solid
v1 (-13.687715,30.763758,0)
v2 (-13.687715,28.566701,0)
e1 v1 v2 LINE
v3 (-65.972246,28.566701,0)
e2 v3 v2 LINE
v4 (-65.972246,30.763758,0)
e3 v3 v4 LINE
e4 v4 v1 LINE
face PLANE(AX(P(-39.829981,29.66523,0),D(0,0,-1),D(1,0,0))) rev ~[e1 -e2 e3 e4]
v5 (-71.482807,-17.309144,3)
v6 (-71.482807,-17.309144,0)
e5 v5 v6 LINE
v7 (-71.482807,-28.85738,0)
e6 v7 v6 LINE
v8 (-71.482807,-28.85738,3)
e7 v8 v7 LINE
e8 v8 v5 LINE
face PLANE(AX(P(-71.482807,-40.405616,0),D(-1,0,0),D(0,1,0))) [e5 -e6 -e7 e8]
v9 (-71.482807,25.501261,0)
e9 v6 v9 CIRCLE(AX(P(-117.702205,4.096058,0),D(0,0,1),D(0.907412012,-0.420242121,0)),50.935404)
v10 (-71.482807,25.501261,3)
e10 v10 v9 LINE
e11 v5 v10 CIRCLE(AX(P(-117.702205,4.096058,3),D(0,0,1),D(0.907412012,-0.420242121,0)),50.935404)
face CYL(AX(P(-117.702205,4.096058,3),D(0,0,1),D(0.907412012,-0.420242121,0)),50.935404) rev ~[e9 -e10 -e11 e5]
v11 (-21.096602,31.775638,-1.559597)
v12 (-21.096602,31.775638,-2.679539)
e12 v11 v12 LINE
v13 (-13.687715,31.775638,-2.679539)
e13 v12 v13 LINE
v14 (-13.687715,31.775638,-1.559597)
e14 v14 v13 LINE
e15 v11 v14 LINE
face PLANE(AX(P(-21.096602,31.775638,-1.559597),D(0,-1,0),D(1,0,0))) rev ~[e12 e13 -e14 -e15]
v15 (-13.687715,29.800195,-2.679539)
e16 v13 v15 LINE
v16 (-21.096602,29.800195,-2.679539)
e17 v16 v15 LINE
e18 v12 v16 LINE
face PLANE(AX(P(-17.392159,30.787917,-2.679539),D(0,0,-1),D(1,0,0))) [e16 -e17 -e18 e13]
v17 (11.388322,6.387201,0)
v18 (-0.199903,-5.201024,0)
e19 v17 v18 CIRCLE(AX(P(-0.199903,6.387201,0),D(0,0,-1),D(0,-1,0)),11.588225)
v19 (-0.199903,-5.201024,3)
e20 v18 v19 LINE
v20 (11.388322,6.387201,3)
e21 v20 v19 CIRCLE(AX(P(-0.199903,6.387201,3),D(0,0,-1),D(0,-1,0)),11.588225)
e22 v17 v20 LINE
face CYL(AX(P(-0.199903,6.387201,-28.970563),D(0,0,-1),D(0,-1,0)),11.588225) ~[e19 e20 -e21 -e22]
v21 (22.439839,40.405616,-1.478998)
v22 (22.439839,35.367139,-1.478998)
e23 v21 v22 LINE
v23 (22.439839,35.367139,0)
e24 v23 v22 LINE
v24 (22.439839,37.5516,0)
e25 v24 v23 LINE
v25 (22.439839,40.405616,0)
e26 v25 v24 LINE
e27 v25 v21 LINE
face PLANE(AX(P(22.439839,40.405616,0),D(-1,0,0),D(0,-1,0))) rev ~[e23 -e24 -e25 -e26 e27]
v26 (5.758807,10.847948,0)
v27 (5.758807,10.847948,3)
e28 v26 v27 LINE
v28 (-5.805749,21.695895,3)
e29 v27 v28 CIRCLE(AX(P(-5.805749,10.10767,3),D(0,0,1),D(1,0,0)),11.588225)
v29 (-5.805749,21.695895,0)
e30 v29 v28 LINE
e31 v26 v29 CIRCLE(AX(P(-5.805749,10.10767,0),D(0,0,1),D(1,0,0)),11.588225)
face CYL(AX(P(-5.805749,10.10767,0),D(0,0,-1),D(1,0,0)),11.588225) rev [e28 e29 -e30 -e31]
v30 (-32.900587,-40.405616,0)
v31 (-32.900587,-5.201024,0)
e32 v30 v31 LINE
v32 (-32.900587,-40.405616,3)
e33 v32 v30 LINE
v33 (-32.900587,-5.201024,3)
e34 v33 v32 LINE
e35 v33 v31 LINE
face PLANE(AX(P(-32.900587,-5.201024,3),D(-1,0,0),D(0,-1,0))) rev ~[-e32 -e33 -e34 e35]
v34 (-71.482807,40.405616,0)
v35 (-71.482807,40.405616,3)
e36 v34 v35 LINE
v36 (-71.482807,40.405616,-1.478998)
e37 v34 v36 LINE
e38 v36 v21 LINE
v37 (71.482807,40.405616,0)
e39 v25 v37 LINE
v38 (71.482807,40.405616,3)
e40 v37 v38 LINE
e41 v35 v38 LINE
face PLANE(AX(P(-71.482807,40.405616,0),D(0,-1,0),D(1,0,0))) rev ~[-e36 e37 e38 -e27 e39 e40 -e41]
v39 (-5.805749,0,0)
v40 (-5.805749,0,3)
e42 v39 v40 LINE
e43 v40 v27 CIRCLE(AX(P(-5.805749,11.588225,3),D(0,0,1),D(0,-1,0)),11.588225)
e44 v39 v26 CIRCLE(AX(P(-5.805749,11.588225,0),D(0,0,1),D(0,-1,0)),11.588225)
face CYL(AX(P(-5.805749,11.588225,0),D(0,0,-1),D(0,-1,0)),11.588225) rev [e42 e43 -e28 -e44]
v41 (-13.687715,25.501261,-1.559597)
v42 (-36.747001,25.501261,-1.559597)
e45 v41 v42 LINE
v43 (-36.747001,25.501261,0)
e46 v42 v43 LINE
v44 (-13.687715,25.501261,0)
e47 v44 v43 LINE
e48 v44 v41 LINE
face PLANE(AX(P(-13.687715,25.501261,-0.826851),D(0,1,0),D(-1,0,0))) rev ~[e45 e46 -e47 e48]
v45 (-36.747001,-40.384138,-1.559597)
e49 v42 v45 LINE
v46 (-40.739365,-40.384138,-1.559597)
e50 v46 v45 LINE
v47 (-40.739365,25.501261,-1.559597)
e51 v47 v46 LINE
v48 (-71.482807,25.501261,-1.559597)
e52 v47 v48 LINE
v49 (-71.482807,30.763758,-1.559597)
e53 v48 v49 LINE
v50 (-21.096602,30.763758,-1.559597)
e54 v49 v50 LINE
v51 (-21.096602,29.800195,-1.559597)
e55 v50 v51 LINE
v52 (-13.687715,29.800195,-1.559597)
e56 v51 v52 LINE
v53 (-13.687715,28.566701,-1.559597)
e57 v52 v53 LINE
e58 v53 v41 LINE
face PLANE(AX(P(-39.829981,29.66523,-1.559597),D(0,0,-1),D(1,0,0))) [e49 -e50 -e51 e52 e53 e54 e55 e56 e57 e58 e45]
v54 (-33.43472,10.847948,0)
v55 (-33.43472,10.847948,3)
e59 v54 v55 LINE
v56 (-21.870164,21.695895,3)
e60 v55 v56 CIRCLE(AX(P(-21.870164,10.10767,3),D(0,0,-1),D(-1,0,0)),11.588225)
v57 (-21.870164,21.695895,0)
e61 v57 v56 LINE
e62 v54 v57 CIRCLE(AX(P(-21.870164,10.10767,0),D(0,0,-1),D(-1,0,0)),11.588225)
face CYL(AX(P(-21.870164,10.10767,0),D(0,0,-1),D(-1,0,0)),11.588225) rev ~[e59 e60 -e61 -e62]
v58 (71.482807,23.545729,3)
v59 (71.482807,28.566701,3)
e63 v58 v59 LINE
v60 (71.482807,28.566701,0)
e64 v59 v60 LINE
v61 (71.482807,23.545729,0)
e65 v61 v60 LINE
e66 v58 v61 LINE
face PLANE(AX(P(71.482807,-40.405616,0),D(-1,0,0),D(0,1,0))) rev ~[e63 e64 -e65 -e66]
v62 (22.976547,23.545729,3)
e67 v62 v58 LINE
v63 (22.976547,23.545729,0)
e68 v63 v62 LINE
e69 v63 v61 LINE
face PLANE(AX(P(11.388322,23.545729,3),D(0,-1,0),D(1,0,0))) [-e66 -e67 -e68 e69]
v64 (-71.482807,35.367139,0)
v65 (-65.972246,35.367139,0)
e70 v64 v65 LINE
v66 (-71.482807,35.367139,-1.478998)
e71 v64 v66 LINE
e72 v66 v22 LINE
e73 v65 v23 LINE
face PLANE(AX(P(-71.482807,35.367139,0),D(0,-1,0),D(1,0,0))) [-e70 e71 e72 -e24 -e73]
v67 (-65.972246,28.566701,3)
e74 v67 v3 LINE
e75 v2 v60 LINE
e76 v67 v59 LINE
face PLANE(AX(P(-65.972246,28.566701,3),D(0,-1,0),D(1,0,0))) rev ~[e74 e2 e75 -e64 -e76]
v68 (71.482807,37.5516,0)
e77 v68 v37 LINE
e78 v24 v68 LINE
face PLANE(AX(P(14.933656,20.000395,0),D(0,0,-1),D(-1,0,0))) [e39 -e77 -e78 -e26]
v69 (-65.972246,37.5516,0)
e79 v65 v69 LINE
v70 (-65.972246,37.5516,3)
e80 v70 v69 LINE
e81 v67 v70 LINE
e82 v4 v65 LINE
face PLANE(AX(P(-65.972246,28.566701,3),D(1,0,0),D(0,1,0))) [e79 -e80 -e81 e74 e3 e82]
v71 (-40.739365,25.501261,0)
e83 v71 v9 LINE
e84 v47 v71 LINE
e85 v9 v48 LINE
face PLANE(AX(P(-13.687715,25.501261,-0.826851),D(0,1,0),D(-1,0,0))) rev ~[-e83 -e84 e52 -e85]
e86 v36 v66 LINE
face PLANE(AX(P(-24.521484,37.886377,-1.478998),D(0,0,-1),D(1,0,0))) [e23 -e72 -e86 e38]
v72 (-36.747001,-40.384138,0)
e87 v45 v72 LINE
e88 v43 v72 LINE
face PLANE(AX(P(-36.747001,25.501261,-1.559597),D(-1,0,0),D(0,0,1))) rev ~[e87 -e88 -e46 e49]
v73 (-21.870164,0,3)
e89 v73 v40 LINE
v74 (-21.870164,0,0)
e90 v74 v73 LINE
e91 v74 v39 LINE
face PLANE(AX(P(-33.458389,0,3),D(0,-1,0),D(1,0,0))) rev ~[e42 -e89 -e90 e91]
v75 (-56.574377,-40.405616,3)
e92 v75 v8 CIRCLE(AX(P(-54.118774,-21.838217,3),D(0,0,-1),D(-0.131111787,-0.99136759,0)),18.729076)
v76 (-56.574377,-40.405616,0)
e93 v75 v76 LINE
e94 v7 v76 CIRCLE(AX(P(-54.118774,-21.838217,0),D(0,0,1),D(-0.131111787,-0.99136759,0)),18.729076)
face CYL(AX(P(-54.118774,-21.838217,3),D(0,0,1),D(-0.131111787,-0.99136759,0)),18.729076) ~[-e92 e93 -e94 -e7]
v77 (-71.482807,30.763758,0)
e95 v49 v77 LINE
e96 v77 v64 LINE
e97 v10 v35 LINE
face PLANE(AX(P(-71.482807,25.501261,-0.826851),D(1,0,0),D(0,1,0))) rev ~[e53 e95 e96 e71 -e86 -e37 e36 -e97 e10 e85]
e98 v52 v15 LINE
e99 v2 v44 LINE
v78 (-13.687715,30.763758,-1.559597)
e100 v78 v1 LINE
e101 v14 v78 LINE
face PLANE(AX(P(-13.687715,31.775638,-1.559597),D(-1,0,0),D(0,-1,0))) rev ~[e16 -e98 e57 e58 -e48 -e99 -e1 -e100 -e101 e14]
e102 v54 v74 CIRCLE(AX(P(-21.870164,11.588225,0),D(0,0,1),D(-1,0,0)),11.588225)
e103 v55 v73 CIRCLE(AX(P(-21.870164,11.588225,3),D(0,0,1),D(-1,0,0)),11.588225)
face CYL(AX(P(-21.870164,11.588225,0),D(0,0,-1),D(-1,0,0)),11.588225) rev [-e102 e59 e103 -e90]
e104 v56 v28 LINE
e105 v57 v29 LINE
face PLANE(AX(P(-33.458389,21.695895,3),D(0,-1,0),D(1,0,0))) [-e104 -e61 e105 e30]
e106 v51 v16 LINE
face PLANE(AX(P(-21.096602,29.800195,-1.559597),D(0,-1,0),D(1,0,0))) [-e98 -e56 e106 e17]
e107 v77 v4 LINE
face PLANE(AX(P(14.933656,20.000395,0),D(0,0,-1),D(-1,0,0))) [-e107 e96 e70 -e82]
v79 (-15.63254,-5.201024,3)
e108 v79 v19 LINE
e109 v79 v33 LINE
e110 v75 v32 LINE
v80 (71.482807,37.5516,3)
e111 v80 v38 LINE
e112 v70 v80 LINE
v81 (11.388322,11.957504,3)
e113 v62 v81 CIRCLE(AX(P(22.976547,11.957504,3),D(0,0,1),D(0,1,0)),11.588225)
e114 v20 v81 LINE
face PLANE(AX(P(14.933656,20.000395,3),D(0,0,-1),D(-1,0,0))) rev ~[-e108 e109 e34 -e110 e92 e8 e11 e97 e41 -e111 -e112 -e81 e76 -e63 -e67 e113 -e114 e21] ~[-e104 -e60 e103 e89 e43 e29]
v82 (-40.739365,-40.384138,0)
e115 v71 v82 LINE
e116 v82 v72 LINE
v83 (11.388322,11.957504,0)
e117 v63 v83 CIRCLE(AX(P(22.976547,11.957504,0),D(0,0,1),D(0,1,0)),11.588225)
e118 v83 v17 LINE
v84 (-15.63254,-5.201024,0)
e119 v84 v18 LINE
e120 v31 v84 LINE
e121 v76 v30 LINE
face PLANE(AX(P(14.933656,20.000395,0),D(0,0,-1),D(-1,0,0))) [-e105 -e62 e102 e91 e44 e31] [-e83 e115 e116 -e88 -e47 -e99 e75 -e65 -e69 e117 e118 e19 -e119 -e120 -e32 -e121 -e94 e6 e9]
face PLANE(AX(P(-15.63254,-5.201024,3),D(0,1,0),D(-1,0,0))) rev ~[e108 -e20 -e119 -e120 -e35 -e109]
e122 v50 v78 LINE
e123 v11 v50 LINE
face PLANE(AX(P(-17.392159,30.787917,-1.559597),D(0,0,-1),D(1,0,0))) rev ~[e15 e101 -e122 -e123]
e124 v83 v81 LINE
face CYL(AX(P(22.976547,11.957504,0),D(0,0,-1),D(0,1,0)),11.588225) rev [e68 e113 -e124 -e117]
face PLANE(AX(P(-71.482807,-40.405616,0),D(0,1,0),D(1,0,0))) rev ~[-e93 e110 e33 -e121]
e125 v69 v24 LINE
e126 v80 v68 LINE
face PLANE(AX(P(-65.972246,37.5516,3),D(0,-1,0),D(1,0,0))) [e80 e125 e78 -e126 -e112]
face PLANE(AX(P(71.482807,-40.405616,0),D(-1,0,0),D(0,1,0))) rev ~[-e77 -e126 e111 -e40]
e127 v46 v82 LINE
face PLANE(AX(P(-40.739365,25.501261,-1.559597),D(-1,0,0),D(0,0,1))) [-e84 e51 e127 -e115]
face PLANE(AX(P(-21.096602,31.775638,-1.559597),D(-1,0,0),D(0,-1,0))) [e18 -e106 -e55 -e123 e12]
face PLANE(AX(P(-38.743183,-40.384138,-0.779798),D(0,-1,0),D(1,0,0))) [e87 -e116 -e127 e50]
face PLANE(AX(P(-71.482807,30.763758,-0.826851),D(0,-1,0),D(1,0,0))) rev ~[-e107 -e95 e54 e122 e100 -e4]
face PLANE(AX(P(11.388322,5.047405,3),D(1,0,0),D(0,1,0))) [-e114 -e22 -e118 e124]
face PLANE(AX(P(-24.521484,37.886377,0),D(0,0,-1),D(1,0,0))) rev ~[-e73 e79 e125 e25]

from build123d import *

# Parameters (mm, degrees)
F0_W         = 142.9656147957
F0_H         = 80.8112323284
F1_DEPTH     = 3
F2_W         = 137.4550536275
F2_H         = 8.9848991483
F2_W_2       = 60.0944850594
F2_H_2       = 18.4983238578
F3_DEPTH     = 52.3
F4_W         = 39.2408655025
F4_H         = 21.6958951205
F5_DEPTH     = 25
F6_W         = 3.3521875739
F6_H         = 44.7733802721
F6_W_2       = 40.9712046385
F7_DEPTH     = 25
F8_W         = 102.604271844
F8_H         = 18.422623165
F9_DEPTH     = 25
F10_T1_DEPTH = 3
F10_T3_DEPTH = 60.941125497
F12_DEPTH    = 25
F14_DEPTH    = 25
F16_DEPTH    = 25
F17_W        = 93.9226467162
F17_H        = 5.0384774804
F18_DEPTH    = 1.4789979905
F19_W        = 52.2845312953
F19_H        = 2.1970570087
F20_DEPTH    = 0.8268505335
F21_DEPTH    = 0.7327459753
F22_W        = 3.9923638105
F22_H        = 1.5595965087
F23_DEPTH    = 65.8853985369
F24_W        = 7.4088871479
F24_H        = 1.9754432142
F25_DEPTH    = 1.11994287


# Not quite as in the source:
# - a fillet or chamfer that OpenCascade refuses, or shapes differently, is made with other operations: its cross-section is extruded or revolved along the edge and cut away or added


with BuildPart() as f1:
    # F0 (on Top) → F1 (new body)
    with BuildSketch(Plane.XY):
        Rectangle(F0_W, F0_H)
    extrude(amount=F1_DEPTH)

    # F2 (on face) → F3 (cut)
    with BuildSketch(Plane.XY.offset(3)):
        with Locations((2.7552805841, 33.0591509119)):
            Rectangle(F2_W, F2_H)
        with Locations((41.4355648682, 14.2965670675)):
            Rectangle(F2_W_2, F2_H_2)
    extrude(amount=-F3_DEPTH, mode=Mode.SUBTRACT)

    # F4 (on face) → F5 (cut)
    with BuildSketch(Plane.XY.offset(3)):
        with Locations((-13.8379565906, 10.8479475603)):
            Rectangle(F4_W, F4_H)
    extrude(amount=-F5_DEPTH, mode=Mode.SUBTRACT)

    # F6 (on face) → F7 (cut)
    with BuildSketch(Plane.XY.offset(3)):
        Polygon((98.6725464463, 0), (13.7504395097, 0), (13.7504395097, -5.2010240033), (17.1026270837, -5.2010240033), (17.1026270837, -49.9744042754), (13.7504395097, -49.9744042754), (13.7504395097, -55.2418604493), (98.6725464463, -55.2418604493), align=None)
        with Locations((15.4265332967, -27.5877141394)):
            Rectangle(F6_W, F6_H)
        with Locations((-6.7351628095, -27.5877141394)):
            Rectangle(F6_W_2, F6_H)
    extrude(amount=-F7_DEPTH, mode=Mode.SUBTRACT)

    # F8 (on face) → F9 (cut)
    with BuildSketch(Plane.XY.offset(3)):
        with Locations((62.6904582605, -4.1639064439)):
            Rectangle(F8_W, F8_H)
    extrude(amount=-F9_DEPTH, mode=Mode.SUBTRACT)

    # F10: fillet of radius 11.5882250994 on 7 edges, made by hand

    # F10_s2 → F10_t1 (join)
    with BuildSketch(Plane.XY):
        with BuildLine():
            ThreePointArc((22.9765474379, 23.5457289964), (14.7824348882, 20.1516164467), (11.3883223385, 11.957503897))
            Line((11.3883223385, 11.957503897), (11.3883223385, 23.5457289964))
            Line((11.3883223385, 23.5457289964), (22.9765474379, 23.5457289964))
        make_face()
        with BuildLine():
            ThreePointArc((-15.6325400293, -5.2010240033), (-23.826652579, -8.595136553), (-27.2207651287, -16.7892491027))
            Line((-27.2207651287, -16.7892491027), (-27.2207651287, -5.2010240033))
            Line((-27.2207651287, -5.2010240033), (-15.6325400293, -5.2010240033))
        make_face()
        with BuildLine():
            ThreePointArc((-33.4583893418, 10.1076700211), (-30.0642767921, 18.3017825708), (-21.8701642424, 21.6958951205))
            Line((-21.8701642424, 21.6958951205), (-33.4583893418, 21.6958951205))
            Line((-33.4583893418, 21.6958951205), (-33.4583893418, 10.1076700211))
        make_face()
        with BuildLine():
            ThreePointArc((-5.8057489387, 0), (2.388363611, 3.3941125497), (5.7824761607, 11.5882250994))
            Line((5.7824761607, 11.5882250994), (5.7824761607, 0))
            Line((5.7824761607, 0), (-5.8057489387, 0))
        make_face()
        with BuildLine():
            ThreePointArc((-33.4583893418, 11.5882250994), (-30.0642767921, 3.3941125497), (-21.8701642424, 0))
            Line((-21.8701642424, 0), (-33.4583893418, 0))
            Line((-33.4583893418, 0), (-33.4583893418, 11.5882250994))
        make_face()
        with BuildLine():
            ThreePointArc((5.7824761607, 10.1076700211), (2.388363611, 18.3017825708), (-5.8057489387, 21.6958951205))
            Line((-5.8057489387, 21.6958951205), (5.7824761607, 21.6958951205))
            Line((5.7824761607, 21.6958951205), (5.7824761607, 10.1076700211))
        make_face()
    extrude(amount=F10_T1_DEPTH)

    # F10_s4 → F10_t3 (cut)
    with BuildSketch(Plane.XY.offset(-28.9705627485)):
        with BuildLine():
            ThreePointArc((-0.1999027609, -5.2010240033), (7.9942097888, -1.8069114536), (11.3883223385, 6.3872010961))
            Line((11.3883223385, 6.3872010961), (11.3883223385, -5.2010240033))
            Line((11.3883223385, -5.2010240033), (-0.1999027609, -5.2010240033))
        make_face()
    extrude(amount=F10_T3_DEPTH, mode=Mode.SUBTRACT)

    # F11 (on face) → F12 (cut)
    with BuildSketch(Plane.XY.offset(3)):
        with BuildLine():
            Line((-71.4828073978, 25.5012605339), (-71.4828073978, -17.3091441393))
            ThreePointArc((-71.4828073978, -17.3091441393), (-66.7668008007, 4.0960581973), (-71.4828073978, 25.5012605339))
        make_face()
    extrude(amount=-F12_DEPTH, mode=Mode.SUBTRACT)

    # F13 (on face) → F14 (cut)
    with BuildSketch(Plane.XY.offset(3)):
        with BuildLine():
            ThreePointArc((-21.3245461018, -6.6952891353), (-30.1185964093, -13.4662376926), (-27.2207651287, -24.1799503565))
            Line((-27.2207651287, -24.1799503565), (-27.2207651287, -16.7892491027))
            ThreePointArc((-27.2207651287, -16.7892491027), (-25.6387183355, -10.944306275), (-21.3245461018, -6.6952891353))
        make_face()
        with BuildLine():
            ThreePointArc((-27.2207651287, -32.8327932205), (-29.4171017882, -37.101902666), (-32.9005867243, -40.4056161642))
            Line((-32.9005867243, -40.4056161642), (-27.2207651287, -40.4056161642))
            Line((-27.2207651287, -40.4056161642), (-27.2207651287, -32.8327932205))
        make_face()
        with BuildLine():
            ThreePointArc((-56.574376872, -40.4056161642), (-65.5880780241, -36.6447482344), (-71.4828073978, -28.8573801517))
            Line((-71.4828073978, -28.8573801517), (-71.4828073978, -40.4056161642))
            Line((-71.4828073978, -40.4056161642), (-56.574376872, -40.4056161642))
        make_face()
    extrude(amount=-F14_DEPTH, mode=Mode.SUBTRACT)

    # F15 (on face) → F16 (cut)
    with BuildSketch(Plane.XY.offset(3)):
        with BuildLine():
            Line((-32.9005867243, -5.2010240033), (-32.9005867243, -40.4056161642))
            ThreePointArc((-32.9005867243, -40.4056161642), (-29.4171017882, -37.101902666), (-27.2207651287, -32.8327932205))
            Line((-27.2207651287, -32.8327932205), (-27.2207651287, -24.1799503565))
            ThreePointArc((-27.2207651287, -24.1799503565), (-30.1185964093, -13.4662376926), (-21.3245461018, -6.6952891353))
            ThreePointArc((-21.3245461018, -6.6952891353), (-18.5749778542, -5.5808138595), (-15.6325400293, -5.2010240033))
            Line((-15.6325400293, -5.2010240033), (-32.9005867243, -5.2010240033))
        make_face()
    extrude(amount=-F16_DEPTH, mode=Mode.SUBTRACT)

    # F17 (on face) → F18 (join)
    with BuildSketch(Plane(origin=(0, 0, 0), x_dir=(1, 0, 0), z_dir=(0, 0, -1))):
        with Locations((-24.5214840397, -37.886377424)):
            Rectangle(F17_W, F17_H)
    extrude(amount=F18_DEPTH)

    # F19 (on face) → F20 (join)
    with BuildSketch(Plane(origin=(0, 0, 0), x_dir=(1, 0, 0), z_dir=(0, 0, -1))):
        with Locations((-39.829980582, -29.6652298421)):
            Rectangle(F19_W, F19_H)
        Polygon((-71.4828073978, -30.7637583464), (-65.9722462296, -30.7637583464), (-65.9722462296, -28.5667013377), (-13.6877149343, -28.5667013377), (-13.6877149343, -25.5012605339), (-71.4828073978, -25.5012605339), align=None)
    extrude(amount=F20_DEPTH)

    # F21 (add): a face of the model
    f21_faces = [f1.faces().sort_by_distance(p)[0] for p in [
        (-42.5852611661, 28.1325094402, -0.8268505335),
    ]]
    extrude(f21_faces, amount=F21_DEPTH)

    # F22 (on face) → F23 (join)
    with BuildSketch(Plane.XZ.offset(-25.5012605339)):
        with Locations((-38.7431830168, -0.7797982544)):
            Rectangle(F22_W, F22_H)
    extrude(amount=F23_DEPTH)

    # F24 (on face) → F25 (join)
    with BuildSketch(Plane(origin=(0, 0, -1.5595965087), x_dir=(1, 0, 0), z_dir=(0, 0, -1))):
        with Locations((-17.3921585083, -30.787916854)):
            Rectangle(F24_W, F24_H)
    extrude(amount=F25_DEPTH)


solid = f1.part
